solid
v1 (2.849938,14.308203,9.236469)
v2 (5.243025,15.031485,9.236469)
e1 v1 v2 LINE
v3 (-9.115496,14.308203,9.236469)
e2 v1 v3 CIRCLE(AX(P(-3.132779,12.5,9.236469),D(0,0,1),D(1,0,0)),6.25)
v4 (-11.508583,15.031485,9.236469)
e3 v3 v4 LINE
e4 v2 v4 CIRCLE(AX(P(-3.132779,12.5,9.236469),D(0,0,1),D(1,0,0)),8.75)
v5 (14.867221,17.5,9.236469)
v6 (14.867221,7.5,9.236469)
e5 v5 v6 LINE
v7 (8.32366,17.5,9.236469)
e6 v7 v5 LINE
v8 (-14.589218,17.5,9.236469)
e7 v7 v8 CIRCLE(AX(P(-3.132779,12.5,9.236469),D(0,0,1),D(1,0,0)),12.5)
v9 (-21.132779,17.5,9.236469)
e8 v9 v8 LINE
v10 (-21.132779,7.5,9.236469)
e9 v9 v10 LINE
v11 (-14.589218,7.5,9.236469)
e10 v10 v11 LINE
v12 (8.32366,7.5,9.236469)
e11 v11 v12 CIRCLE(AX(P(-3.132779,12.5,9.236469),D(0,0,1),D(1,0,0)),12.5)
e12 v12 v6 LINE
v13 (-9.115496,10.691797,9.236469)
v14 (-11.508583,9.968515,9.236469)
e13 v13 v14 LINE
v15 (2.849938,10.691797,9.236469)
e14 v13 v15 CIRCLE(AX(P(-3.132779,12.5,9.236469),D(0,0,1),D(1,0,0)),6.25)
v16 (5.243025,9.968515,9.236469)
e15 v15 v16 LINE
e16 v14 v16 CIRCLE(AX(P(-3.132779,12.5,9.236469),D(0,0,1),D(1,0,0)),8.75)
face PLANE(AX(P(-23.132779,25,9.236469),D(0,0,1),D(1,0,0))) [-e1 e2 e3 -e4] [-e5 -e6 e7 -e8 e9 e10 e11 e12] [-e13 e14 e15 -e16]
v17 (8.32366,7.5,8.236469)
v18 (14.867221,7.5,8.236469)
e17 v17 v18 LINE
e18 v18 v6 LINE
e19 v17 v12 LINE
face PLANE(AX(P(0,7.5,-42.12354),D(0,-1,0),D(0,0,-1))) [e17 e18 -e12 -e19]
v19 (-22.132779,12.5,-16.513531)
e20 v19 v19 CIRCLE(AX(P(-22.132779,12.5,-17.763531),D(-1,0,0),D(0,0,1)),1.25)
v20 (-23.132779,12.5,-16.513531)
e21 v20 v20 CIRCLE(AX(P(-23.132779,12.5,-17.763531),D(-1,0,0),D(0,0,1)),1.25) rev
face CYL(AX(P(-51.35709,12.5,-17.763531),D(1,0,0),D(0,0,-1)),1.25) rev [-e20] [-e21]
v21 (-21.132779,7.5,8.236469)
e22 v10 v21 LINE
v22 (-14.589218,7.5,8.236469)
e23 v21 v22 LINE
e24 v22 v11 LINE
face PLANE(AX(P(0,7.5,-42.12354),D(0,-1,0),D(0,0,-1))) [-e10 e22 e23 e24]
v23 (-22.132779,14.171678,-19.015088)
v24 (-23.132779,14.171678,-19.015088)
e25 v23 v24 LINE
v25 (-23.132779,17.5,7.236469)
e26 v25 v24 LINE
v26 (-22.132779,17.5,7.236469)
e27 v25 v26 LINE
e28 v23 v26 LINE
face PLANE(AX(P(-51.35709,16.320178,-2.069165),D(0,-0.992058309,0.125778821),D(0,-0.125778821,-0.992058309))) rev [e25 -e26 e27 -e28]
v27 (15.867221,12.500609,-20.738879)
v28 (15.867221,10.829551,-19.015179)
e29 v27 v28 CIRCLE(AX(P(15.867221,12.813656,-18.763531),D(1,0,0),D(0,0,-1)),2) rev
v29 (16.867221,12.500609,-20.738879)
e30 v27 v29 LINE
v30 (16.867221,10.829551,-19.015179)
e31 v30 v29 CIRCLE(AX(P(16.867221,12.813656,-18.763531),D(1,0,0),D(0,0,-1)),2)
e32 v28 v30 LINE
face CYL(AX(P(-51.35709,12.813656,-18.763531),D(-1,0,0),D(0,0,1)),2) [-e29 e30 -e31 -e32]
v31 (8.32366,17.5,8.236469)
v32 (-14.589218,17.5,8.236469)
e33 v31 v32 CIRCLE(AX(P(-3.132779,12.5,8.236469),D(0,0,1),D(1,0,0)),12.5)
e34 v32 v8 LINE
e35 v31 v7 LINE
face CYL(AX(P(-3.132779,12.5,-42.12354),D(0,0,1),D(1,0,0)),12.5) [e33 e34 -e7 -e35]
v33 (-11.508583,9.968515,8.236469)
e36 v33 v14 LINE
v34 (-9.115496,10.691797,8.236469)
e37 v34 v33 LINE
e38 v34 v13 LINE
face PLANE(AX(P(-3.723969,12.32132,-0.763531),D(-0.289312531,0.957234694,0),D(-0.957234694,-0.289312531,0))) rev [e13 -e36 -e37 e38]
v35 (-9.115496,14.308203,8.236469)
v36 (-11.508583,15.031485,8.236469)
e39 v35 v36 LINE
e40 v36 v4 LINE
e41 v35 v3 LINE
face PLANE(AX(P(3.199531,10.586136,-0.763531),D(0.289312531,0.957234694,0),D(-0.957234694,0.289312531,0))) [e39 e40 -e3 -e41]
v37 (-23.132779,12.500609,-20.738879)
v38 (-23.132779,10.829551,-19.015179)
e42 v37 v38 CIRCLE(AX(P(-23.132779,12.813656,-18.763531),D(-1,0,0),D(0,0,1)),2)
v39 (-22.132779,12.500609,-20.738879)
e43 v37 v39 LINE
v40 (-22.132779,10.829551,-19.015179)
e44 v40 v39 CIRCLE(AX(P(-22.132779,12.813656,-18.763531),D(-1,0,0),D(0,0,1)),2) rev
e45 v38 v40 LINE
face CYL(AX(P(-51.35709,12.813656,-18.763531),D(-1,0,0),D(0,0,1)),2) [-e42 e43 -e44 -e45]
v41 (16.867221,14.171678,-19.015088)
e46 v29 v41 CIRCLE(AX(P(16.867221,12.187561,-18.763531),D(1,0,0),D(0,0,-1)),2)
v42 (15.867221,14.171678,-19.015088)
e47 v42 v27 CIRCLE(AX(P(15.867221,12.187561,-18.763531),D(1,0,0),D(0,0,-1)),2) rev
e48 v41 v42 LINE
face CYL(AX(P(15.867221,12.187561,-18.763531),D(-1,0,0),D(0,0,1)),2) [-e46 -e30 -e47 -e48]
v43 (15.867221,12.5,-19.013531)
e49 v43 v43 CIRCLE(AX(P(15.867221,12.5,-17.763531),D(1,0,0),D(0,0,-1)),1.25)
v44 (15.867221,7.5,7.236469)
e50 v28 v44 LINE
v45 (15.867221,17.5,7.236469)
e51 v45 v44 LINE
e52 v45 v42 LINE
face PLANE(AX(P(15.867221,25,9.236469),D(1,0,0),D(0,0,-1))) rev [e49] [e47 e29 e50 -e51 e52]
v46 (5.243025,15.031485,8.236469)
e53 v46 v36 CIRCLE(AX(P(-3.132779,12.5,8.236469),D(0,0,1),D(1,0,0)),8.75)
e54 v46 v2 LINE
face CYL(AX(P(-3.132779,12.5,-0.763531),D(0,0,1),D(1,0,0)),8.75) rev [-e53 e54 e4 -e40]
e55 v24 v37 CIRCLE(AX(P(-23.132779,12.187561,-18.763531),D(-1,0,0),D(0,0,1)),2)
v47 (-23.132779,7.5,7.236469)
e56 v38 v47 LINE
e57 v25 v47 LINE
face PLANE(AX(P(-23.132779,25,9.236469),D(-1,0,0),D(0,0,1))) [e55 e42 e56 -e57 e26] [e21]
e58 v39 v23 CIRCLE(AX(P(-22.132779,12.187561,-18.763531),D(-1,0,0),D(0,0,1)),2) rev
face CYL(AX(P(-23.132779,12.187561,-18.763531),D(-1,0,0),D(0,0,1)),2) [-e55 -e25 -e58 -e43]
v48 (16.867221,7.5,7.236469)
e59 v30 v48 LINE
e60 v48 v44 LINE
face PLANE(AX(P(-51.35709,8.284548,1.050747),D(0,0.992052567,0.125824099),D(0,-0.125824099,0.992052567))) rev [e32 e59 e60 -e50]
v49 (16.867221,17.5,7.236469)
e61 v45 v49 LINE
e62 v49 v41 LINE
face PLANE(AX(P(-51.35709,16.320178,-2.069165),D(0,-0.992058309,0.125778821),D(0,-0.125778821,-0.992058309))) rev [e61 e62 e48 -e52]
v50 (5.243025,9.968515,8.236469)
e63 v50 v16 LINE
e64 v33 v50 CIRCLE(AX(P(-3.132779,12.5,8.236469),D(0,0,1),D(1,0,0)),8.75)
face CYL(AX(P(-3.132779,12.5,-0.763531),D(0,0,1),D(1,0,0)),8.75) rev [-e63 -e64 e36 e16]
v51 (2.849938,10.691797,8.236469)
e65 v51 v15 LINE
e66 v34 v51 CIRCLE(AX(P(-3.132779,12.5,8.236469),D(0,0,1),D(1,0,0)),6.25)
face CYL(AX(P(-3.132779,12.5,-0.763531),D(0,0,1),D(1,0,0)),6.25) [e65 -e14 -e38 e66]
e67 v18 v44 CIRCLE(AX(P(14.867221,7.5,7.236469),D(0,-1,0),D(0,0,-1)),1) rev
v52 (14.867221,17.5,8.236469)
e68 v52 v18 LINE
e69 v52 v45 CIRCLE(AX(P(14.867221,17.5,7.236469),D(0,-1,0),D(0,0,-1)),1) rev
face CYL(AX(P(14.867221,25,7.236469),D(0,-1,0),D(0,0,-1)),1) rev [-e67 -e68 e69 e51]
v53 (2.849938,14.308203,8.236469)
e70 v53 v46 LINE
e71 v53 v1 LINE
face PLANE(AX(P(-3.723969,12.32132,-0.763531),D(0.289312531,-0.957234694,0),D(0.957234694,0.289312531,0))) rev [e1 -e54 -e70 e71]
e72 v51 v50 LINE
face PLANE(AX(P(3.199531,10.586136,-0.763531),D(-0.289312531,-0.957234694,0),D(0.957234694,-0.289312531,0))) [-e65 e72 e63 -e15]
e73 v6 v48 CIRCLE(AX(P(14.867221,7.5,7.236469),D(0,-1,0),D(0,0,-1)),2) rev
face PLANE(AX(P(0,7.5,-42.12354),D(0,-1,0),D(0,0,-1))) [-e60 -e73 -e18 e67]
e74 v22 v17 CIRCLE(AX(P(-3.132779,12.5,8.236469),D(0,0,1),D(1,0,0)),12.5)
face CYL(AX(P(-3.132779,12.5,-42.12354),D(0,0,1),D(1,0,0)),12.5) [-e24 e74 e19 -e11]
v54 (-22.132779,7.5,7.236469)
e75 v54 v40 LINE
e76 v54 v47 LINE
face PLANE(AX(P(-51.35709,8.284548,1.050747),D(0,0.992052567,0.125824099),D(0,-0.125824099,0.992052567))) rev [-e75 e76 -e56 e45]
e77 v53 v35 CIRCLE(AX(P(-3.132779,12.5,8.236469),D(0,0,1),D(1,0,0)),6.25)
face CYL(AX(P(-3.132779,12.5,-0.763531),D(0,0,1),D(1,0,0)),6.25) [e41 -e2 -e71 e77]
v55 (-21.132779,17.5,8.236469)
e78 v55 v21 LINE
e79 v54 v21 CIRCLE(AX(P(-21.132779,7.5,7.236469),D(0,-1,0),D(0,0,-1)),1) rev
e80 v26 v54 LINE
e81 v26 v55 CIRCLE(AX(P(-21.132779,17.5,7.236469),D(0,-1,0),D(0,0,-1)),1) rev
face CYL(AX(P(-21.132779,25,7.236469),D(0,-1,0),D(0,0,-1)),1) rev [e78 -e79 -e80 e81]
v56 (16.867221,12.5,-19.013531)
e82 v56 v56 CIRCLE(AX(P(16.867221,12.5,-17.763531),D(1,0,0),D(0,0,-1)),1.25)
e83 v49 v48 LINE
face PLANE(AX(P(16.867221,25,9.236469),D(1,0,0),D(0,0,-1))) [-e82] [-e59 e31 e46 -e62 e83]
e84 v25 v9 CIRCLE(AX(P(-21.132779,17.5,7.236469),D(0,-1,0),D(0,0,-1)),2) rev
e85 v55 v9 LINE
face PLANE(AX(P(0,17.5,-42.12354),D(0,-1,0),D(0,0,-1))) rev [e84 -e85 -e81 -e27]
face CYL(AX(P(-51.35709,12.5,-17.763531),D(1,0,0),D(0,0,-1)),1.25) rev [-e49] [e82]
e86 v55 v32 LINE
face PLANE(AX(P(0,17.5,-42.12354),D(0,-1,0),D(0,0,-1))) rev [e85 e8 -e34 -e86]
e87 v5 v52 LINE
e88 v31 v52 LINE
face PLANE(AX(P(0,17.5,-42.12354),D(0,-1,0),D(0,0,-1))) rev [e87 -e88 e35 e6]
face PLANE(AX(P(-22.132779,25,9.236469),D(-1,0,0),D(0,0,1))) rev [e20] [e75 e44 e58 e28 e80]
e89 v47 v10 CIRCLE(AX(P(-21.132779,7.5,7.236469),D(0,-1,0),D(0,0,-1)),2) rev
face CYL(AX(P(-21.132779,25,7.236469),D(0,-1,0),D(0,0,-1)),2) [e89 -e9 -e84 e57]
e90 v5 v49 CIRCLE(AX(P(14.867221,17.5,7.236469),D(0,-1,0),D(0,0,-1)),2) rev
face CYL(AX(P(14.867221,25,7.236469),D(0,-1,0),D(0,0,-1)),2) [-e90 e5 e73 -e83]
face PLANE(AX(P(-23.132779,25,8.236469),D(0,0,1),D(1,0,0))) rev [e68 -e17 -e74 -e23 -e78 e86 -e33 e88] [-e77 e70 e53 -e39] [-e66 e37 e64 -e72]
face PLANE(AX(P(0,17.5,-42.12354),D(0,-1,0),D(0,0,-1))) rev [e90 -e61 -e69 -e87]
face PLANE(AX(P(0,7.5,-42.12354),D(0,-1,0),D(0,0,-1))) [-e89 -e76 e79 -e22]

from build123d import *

# Parameters (mm, degrees)
SM_BASE_FLANGE_1_DEPTH = 25
CUT_EXTRUDE_2_REACH    = 47.389
SKETCH_7_W             = 2
SKETCH_7_H             = 7.5
CUT_EXTRUDE_3_REACH    = 53.538
SKETCH_8_R             = 1.25
FILLET_1_R             = 2
CUT_EXTRUDE_4_DEPTH    = 10


# Sheet-metal steps are written as plain solids
with BuildPart() as part:
    # Sketch 1 → 基体-法兰1 (new body)
    with BuildSketch(Plane(origin=(0, 0, 0), x_dir=(1, 0, 0), z_dir=(0, 1, 0))):
        with BuildLine():
            Line((-23.132778959, 20.763530703), (-23.132778959, -7.236469297))
            ThreePointArc((-23.132778959, -7.236469297), (-22.546992522, -8.650682859), (-21.132778959, -9.236469297))
            Line((-21.132778959, -9.236469297), (14.867221041, -9.236469297))
            ThreePointArc((14.867221041, -9.236469297), (16.281434603, -8.650682859), (16.867221041, -7.236469297))
            Line((16.867221041, -7.236469297), (16.867221041, 20.763530703))
            Line((16.867221041, 20.763530703), (15.867221041, 20.763530703))
            Line((15.867221041, 20.763530703), (15.867221041, -7.236469297))
            ThreePointArc((15.867221041, -7.236469297), (15.574327822, -7.943576078), (14.867221041, -8.236469297))
            Line((14.867221041, -8.236469297), (-21.132778959, -8.236469297))
            ThreePointArc((-21.132778959, -8.236469297), (-21.839885741, -7.943576078), (-22.132778959, -7.236469297))
            Line((-22.132778959, -7.236469297), (-22.132778959, 20.763530703))
            Line((-22.132778959, 20.763530703), (-23.132778959, 20.763530703))
        make_face()
    extrude(amount=SM_BASE_FLANGE_1_DEPTH)

    # 切除-拉伸2: up to this face of the body (flat: up to its plane)
    cut_extrude_2_end = Plane(part.part.faces().sort_by_distance((-22.632778959, 12.5, -20.763530703))[0])
    # 草图7 → 切除-拉伸2 (cut, up to the picked face)
    with BuildSketch(Plane.XY.offset(9.236469297), mode=Mode.PRIVATE) as cut_extrude_2_sk1:
        with BuildLine():
            Line((-21.132778959, 25), (-21.132778959, 17.5))
            Line((-21.132778959, 17.5), (-14.589218197, 17.5))
            ThreePointArc((-14.589218197, 17.5), (-9.979310906, 22.958250346), (-3.132778905, 25))
            Line((-3.132778905, 25), (-21.132778959, 25))
        make_face()
    cut_extrude_2_tool1 = split(extrude(cut_extrude_2_sk1.sketch, amount=-CUT_EXTRUDE_2_REACH, mode=Mode.PRIVATE), bisect_by=cut_extrude_2_end, keep=Keep.BOTH, mode=Mode.PRIVATE)
    # 草图7 → 切除-拉伸2 (cut, up to the picked face)
    with BuildSketch(Plane.XY.offset(9.236469297), mode=Mode.PRIVATE) as cut_extrude_2_sk2:
        with Locations((-22.132778959, 21.25)):
            Rectangle(SKETCH_7_W, SKETCH_7_H)
    cut_extrude_2_tool2 = split(extrude(cut_extrude_2_sk2.sketch, amount=-CUT_EXTRUDE_2_REACH, mode=Mode.PRIVATE), bisect_by=cut_extrude_2_end, keep=Keep.BOTH, mode=Mode.PRIVATE)
    # 草图7 → 切除-拉伸2 (cut, up to the picked face)
    with BuildSketch(Plane.XY.offset(9.236469297), mode=Mode.PRIVATE) as cut_extrude_2_sk3:
        with BuildLine():
            Line((14.867221041, 25), (-3.132778905, 25))
            ThreePointArc((-3.132778905, 25), (3.713753032, 22.958250317), (8.323660278, 17.5))
            Line((8.323660278, 17.5), (14.867221041, 17.5))
            Line((14.867221041, 17.5), (14.867221041, 25))
        make_face()
    cut_extrude_2_tool3 = split(extrude(cut_extrude_2_sk3.sketch, amount=-CUT_EXTRUDE_2_REACH, mode=Mode.PRIVATE), bisect_by=cut_extrude_2_end, keep=Keep.BOTH, mode=Mode.PRIVATE)
    # 草图7 → 切除-拉伸2 (cut, up to the picked face)
    with BuildSketch(Plane.XY.offset(9.236469297), mode=Mode.PRIVATE) as cut_extrude_2_sk4:
        with Locations((15.867221041, 21.25)):
            Rectangle(SKETCH_7_W, SKETCH_7_H)
    cut_extrude_2_tool4 = split(extrude(cut_extrude_2_sk4.sketch, amount=-CUT_EXTRUDE_2_REACH, mode=Mode.PRIVATE), bisect_by=cut_extrude_2_end, keep=Keep.BOTH, mode=Mode.PRIVATE)
    # 草图7 → 切除-拉伸2 (cut, up to the picked face)
    with BuildSketch(Plane.XY.offset(9.236469297), mode=Mode.PRIVATE) as cut_extrude_2_sk5:
        with Locations((15.867221041, 3.75)):
            Rectangle(SKETCH_7_W, SKETCH_7_H)
    cut_extrude_2_tool5 = split(extrude(cut_extrude_2_sk5.sketch, amount=-CUT_EXTRUDE_2_REACH, mode=Mode.PRIVATE), bisect_by=cut_extrude_2_end, keep=Keep.BOTH, mode=Mode.PRIVATE)
    # 草图7 → 切除-拉伸2 (cut, up to the picked face)
    with BuildSketch(Plane.XY.offset(9.236469297), mode=Mode.PRIVATE) as cut_extrude_2_sk6:
        with BuildLine():
            ThreePointArc((8.323660278, 7.5), (3.713752992, 2.041749657), (-3.132779, 0))
            Line((-3.132779, 0), (14.867221041, 0))
            Line((14.867221041, 0), (14.867221041, 7.5))
            Line((14.867221041, 7.5), (8.323660278, 7.5))
        make_face()
    cut_extrude_2_tool6 = split(extrude(cut_extrude_2_sk6.sketch, amount=-CUT_EXTRUDE_2_REACH, mode=Mode.PRIVATE), bisect_by=cut_extrude_2_end, keep=Keep.BOTH, mode=Mode.PRIVATE)
    # 草图7 → 切除-拉伸2 (cut, up to the picked face)
    with BuildSketch(Plane.XY.offset(9.236469297), mode=Mode.PRIVATE) as cut_extrude_2_sk7:
        with BuildLine():
            Line((-14.589218197, 7.5), (-21.132778959, 7.5))
            Line((-21.132778959, 7.5), (-21.132778959, 0))
            Line((-21.132778959, 0), (-3.132779, 0))
            ThreePointArc((-3.132779, 0), (-9.979310945, 2.041749679), (-14.589218197, 7.5))
        make_face()
    cut_extrude_2_tool7 = split(extrude(cut_extrude_2_sk7.sketch, amount=-CUT_EXTRUDE_2_REACH, mode=Mode.PRIVATE), bisect_by=cut_extrude_2_end, keep=Keep.BOTH, mode=Mode.PRIVATE)
    # 草图7 → 切除-拉伸2 (cut, up to the picked face)
    with BuildSketch(Plane.XY.offset(9.236469297), mode=Mode.PRIVATE) as cut_extrude_2_sk8:
        with Locations((-22.132778959, 3.75)):
            Rectangle(SKETCH_7_W, SKETCH_7_H)
    cut_extrude_2_tool8 = split(extrude(cut_extrude_2_sk8.sketch, amount=-CUT_EXTRUDE_2_REACH, mode=Mode.PRIVATE), bisect_by=cut_extrude_2_end, keep=Keep.BOTH, mode=Mode.PRIVATE)
    add(cut_extrude_2_tool1.solids().sort_by(Axis((-15.911203, 21.806262, 9.236469), (0, 0, -1)))[0], mode=Mode.SUBTRACT)
    add(cut_extrude_2_tool2.solids().sort_by(Axis((-22.132779, 21.25, 9.236469), (0, 0, -1)))[0], mode=Mode.SUBTRACT)
    add(cut_extrude_2_tool3.solids().sort_by(Axis((9.645646, 21.806262, 9.236469), (0, 0, -1)))[0], mode=Mode.SUBTRACT)
    add(cut_extrude_2_tool4.solids().sort_by(Axis((15.867221, 21.25, 9.236469), (0, 0, -1)))[0], mode=Mode.SUBTRACT)
    add(cut_extrude_2_tool5.solids().sort_by(Axis((15.867221, 3.75, 9.236469), (0, 0, -1)))[0], mode=Mode.SUBTRACT)
    add(cut_extrude_2_tool6.solids().sort_by(Axis((9.645646, 3.193738, 9.236469), (0, 0, -1)))[0], mode=Mode.SUBTRACT)
    add(cut_extrude_2_tool7.solids().sort_by(Axis((-15.911203, 3.193738, 9.236469), (0, 0, -1)))[0], mode=Mode.SUBTRACT)
    add(cut_extrude_2_tool8.solids().sort_by(Axis((-22.132779, 3.75, 9.236469), (0, 0, -1)))[0], mode=Mode.SUBTRACT)

    # 切除-拉伸3: up to this face of the body (flat: up to its plane)
    cut_extrude_3_end = Plane(part.part.faces().sort_by_distance((-23.132778959, 12.5, -6.763530703))[0])
    # 草图8 → 切除-拉伸3 (cut, up to the picked face)
    with BuildSketch(Plane(origin=(16.867221041, 0, 0), x_dir=(0, 0, -1), z_dir=(1, 0, 0)), mode=Mode.PRIVATE) as cut_extrude_3_sk1:
        Polygon((20.763530703, 17.5), (-7.236469297, 17.5), (20.763530703, 13.95), align=None)
    cut_extrude_3_tool1 = split(extrude(cut_extrude_3_sk1.sketch, amount=-CUT_EXTRUDE_3_REACH, mode=Mode.PRIVATE), bisect_by=cut_extrude_3_end, keep=Keep.BOTH, mode=Mode.PRIVATE)
    # 草图8 → 切除-拉伸3 (cut, up to the picked face)
    with BuildSketch(Plane(origin=(16.867221041, 0, 0), x_dir=(0, 0, -1), z_dir=(1, 0, 0)), mode=Mode.PRIVATE) as cut_extrude_3_sk2:
        Polygon((20.763530703, 11.051298474), (-7.236469297, 7.5), (20.763530703, 7.5), align=None)
    cut_extrude_3_tool2 = split(extrude(cut_extrude_3_sk2.sketch, amount=-CUT_EXTRUDE_3_REACH, mode=Mode.PRIVATE), bisect_by=cut_extrude_3_end, keep=Keep.BOTH, mode=Mode.PRIVATE)
    # 草图8 → 切除-拉伸3 (cut, up to the picked face)
    with BuildSketch(Plane(origin=(16.867221041, 0, 0), x_dir=(0, 0, -1), z_dir=(1, 0, 0)), mode=Mode.PRIVATE) as cut_extrude_3_sk3:
        with Locations(Location((17.763530703, 12.5, 0), (0, 0, 180))):
            Circle(SKETCH_8_R)
    cut_extrude_3_tool3 = split(extrude(cut_extrude_3_sk3.sketch, amount=-CUT_EXTRUDE_3_REACH, mode=Mode.PRIVATE), bisect_by=cut_extrude_3_end, keep=Keep.BOTH, mode=Mode.PRIVATE)
    add(cut_extrude_3_tool1.solids().sort_by(Axis((16.867221, 16.316667, -11.430197), (-1, 0, 0)))[0], mode=Mode.SUBTRACT)
    add(cut_extrude_3_tool2.solids().sort_by(Axis((16.867221, 8.683766, -11.430197), (-1, 0, 0)))[0], mode=Mode.SUBTRACT)
    add(cut_extrude_3_tool3.solids().sort_by(Axis((16.867221, 12.5, -17.763531), (-1, 0, 0)))[0], mode=Mode.SUBTRACT)

    # 圆角1
    # the kernel refuses this fillet: 2 mm, written as the material it takes off along each edge
    with BuildSketch(Plane(origin=(-17.726883899, 11.051298474, -20.763530703), x_dir=(0, -0.12582409885038226, 0.9920525672304312), z_dir=(-1, 0, 0)), Plane(origin=(21.273116101, 11.051298474, -20.763530703), x_dir=(0, -0.12582409885038226, 0.9920525672304312), z_dir=(-1, 0, 0))) as fillet_1_piece_1:
        with BuildLine():
            CenterArc((FILLET_1_R * 0.881179012106, FILLET_1_R), FILLET_1_R, 187.228348929, 82.771651071)
            Line((-FILLET_1_R * 0.110873555124, FILLET_1_R * 0.87417590115), (0, 0))
            Line((0, 0), (FILLET_1_R * 0.881179012106, 0))
        make_face()
    extrude(amount=9.811790121, mode=Mode.SUBTRACT)
    with BuildSketch(Plane(origin=(-17.726681198, 13.95, -20.763530703), x_dir=(0, -1, 0), z_dir=(-1, 0, 0))) as fillet_1_piece_2:
        with BuildLine():
            CenterArc((FILLET_1_R * 0.881219552242, FILLET_1_R), FILLET_1_R, 187.225733942, 82.774266058)
            Line((-FILLET_1_R * 0.110838756585, FILLET_1_R * 0.874221178702), (0, 0))
            Line((0, 0), (FILLET_1_R * 0.881219552242, 0))
        make_face()
    extrude(amount=9.812195522, mode=Mode.SUBTRACT)
    with BuildSketch(Plane(origin=(21.273318802, 13.95, -20.763530703), x_dir=(0, 0.12577882129772675, 0.9920583088271347), z_dir=(-1, 0, 0))) as fillet_1_piece_3:
        with BuildLine():
            CenterArc((FILLET_1_R * 0.881219552242, -FILLET_1_R), FILLET_1_R, 90, 82.774266058)
            Line((-FILLET_1_R * 0.110838756585, -FILLET_1_R * 0.874221178702), (0, 0))
            Line((0, 0), (FILLET_1_R * 0.881219552242, 0))
        make_face()
    extrude(amount=9.812195522, mode=Mode.SUBTRACT)

    # 草图9 → 切除-拉伸4 (cut)
    with BuildSketch(Plane.XY.offset(9.236469297)):
        with BuildLine():
            ThreePointArc((2.849937878, 14.308203319), (-3.132778959, 18.75), (-9.115495797, 14.308203319))
            Line((-9.115495797, 14.308203319), (-11.508582532, 15.031484647))
            ThreePointArc((-11.508582532, 15.031484647), (-3.132778959, 21.25), (5.243024613, 15.031484647))
            Line((5.243024613, 15.031484647), (2.849937878, 14.308203319))
        make_face()
        with BuildLine():
            Line((-9.115495797, 10.691796681), (-11.508582532, 9.968515353))
            ThreePointArc((-11.508582532, 9.968515353), (-3.132778959, 3.75), (5.243024613, 9.968515353))
            Line((5.243024613, 9.968515353), (2.849937878, 10.691796681))
            ThreePointArc((2.849937878, 10.691796681), (-3.132778959, 6.25), (-9.115495797, 10.691796681))
        make_face()
    extrude(amount=-CUT_EXTRUDE_4_DEPTH, mode=Mode.SUBTRACT)


solid = part.part
